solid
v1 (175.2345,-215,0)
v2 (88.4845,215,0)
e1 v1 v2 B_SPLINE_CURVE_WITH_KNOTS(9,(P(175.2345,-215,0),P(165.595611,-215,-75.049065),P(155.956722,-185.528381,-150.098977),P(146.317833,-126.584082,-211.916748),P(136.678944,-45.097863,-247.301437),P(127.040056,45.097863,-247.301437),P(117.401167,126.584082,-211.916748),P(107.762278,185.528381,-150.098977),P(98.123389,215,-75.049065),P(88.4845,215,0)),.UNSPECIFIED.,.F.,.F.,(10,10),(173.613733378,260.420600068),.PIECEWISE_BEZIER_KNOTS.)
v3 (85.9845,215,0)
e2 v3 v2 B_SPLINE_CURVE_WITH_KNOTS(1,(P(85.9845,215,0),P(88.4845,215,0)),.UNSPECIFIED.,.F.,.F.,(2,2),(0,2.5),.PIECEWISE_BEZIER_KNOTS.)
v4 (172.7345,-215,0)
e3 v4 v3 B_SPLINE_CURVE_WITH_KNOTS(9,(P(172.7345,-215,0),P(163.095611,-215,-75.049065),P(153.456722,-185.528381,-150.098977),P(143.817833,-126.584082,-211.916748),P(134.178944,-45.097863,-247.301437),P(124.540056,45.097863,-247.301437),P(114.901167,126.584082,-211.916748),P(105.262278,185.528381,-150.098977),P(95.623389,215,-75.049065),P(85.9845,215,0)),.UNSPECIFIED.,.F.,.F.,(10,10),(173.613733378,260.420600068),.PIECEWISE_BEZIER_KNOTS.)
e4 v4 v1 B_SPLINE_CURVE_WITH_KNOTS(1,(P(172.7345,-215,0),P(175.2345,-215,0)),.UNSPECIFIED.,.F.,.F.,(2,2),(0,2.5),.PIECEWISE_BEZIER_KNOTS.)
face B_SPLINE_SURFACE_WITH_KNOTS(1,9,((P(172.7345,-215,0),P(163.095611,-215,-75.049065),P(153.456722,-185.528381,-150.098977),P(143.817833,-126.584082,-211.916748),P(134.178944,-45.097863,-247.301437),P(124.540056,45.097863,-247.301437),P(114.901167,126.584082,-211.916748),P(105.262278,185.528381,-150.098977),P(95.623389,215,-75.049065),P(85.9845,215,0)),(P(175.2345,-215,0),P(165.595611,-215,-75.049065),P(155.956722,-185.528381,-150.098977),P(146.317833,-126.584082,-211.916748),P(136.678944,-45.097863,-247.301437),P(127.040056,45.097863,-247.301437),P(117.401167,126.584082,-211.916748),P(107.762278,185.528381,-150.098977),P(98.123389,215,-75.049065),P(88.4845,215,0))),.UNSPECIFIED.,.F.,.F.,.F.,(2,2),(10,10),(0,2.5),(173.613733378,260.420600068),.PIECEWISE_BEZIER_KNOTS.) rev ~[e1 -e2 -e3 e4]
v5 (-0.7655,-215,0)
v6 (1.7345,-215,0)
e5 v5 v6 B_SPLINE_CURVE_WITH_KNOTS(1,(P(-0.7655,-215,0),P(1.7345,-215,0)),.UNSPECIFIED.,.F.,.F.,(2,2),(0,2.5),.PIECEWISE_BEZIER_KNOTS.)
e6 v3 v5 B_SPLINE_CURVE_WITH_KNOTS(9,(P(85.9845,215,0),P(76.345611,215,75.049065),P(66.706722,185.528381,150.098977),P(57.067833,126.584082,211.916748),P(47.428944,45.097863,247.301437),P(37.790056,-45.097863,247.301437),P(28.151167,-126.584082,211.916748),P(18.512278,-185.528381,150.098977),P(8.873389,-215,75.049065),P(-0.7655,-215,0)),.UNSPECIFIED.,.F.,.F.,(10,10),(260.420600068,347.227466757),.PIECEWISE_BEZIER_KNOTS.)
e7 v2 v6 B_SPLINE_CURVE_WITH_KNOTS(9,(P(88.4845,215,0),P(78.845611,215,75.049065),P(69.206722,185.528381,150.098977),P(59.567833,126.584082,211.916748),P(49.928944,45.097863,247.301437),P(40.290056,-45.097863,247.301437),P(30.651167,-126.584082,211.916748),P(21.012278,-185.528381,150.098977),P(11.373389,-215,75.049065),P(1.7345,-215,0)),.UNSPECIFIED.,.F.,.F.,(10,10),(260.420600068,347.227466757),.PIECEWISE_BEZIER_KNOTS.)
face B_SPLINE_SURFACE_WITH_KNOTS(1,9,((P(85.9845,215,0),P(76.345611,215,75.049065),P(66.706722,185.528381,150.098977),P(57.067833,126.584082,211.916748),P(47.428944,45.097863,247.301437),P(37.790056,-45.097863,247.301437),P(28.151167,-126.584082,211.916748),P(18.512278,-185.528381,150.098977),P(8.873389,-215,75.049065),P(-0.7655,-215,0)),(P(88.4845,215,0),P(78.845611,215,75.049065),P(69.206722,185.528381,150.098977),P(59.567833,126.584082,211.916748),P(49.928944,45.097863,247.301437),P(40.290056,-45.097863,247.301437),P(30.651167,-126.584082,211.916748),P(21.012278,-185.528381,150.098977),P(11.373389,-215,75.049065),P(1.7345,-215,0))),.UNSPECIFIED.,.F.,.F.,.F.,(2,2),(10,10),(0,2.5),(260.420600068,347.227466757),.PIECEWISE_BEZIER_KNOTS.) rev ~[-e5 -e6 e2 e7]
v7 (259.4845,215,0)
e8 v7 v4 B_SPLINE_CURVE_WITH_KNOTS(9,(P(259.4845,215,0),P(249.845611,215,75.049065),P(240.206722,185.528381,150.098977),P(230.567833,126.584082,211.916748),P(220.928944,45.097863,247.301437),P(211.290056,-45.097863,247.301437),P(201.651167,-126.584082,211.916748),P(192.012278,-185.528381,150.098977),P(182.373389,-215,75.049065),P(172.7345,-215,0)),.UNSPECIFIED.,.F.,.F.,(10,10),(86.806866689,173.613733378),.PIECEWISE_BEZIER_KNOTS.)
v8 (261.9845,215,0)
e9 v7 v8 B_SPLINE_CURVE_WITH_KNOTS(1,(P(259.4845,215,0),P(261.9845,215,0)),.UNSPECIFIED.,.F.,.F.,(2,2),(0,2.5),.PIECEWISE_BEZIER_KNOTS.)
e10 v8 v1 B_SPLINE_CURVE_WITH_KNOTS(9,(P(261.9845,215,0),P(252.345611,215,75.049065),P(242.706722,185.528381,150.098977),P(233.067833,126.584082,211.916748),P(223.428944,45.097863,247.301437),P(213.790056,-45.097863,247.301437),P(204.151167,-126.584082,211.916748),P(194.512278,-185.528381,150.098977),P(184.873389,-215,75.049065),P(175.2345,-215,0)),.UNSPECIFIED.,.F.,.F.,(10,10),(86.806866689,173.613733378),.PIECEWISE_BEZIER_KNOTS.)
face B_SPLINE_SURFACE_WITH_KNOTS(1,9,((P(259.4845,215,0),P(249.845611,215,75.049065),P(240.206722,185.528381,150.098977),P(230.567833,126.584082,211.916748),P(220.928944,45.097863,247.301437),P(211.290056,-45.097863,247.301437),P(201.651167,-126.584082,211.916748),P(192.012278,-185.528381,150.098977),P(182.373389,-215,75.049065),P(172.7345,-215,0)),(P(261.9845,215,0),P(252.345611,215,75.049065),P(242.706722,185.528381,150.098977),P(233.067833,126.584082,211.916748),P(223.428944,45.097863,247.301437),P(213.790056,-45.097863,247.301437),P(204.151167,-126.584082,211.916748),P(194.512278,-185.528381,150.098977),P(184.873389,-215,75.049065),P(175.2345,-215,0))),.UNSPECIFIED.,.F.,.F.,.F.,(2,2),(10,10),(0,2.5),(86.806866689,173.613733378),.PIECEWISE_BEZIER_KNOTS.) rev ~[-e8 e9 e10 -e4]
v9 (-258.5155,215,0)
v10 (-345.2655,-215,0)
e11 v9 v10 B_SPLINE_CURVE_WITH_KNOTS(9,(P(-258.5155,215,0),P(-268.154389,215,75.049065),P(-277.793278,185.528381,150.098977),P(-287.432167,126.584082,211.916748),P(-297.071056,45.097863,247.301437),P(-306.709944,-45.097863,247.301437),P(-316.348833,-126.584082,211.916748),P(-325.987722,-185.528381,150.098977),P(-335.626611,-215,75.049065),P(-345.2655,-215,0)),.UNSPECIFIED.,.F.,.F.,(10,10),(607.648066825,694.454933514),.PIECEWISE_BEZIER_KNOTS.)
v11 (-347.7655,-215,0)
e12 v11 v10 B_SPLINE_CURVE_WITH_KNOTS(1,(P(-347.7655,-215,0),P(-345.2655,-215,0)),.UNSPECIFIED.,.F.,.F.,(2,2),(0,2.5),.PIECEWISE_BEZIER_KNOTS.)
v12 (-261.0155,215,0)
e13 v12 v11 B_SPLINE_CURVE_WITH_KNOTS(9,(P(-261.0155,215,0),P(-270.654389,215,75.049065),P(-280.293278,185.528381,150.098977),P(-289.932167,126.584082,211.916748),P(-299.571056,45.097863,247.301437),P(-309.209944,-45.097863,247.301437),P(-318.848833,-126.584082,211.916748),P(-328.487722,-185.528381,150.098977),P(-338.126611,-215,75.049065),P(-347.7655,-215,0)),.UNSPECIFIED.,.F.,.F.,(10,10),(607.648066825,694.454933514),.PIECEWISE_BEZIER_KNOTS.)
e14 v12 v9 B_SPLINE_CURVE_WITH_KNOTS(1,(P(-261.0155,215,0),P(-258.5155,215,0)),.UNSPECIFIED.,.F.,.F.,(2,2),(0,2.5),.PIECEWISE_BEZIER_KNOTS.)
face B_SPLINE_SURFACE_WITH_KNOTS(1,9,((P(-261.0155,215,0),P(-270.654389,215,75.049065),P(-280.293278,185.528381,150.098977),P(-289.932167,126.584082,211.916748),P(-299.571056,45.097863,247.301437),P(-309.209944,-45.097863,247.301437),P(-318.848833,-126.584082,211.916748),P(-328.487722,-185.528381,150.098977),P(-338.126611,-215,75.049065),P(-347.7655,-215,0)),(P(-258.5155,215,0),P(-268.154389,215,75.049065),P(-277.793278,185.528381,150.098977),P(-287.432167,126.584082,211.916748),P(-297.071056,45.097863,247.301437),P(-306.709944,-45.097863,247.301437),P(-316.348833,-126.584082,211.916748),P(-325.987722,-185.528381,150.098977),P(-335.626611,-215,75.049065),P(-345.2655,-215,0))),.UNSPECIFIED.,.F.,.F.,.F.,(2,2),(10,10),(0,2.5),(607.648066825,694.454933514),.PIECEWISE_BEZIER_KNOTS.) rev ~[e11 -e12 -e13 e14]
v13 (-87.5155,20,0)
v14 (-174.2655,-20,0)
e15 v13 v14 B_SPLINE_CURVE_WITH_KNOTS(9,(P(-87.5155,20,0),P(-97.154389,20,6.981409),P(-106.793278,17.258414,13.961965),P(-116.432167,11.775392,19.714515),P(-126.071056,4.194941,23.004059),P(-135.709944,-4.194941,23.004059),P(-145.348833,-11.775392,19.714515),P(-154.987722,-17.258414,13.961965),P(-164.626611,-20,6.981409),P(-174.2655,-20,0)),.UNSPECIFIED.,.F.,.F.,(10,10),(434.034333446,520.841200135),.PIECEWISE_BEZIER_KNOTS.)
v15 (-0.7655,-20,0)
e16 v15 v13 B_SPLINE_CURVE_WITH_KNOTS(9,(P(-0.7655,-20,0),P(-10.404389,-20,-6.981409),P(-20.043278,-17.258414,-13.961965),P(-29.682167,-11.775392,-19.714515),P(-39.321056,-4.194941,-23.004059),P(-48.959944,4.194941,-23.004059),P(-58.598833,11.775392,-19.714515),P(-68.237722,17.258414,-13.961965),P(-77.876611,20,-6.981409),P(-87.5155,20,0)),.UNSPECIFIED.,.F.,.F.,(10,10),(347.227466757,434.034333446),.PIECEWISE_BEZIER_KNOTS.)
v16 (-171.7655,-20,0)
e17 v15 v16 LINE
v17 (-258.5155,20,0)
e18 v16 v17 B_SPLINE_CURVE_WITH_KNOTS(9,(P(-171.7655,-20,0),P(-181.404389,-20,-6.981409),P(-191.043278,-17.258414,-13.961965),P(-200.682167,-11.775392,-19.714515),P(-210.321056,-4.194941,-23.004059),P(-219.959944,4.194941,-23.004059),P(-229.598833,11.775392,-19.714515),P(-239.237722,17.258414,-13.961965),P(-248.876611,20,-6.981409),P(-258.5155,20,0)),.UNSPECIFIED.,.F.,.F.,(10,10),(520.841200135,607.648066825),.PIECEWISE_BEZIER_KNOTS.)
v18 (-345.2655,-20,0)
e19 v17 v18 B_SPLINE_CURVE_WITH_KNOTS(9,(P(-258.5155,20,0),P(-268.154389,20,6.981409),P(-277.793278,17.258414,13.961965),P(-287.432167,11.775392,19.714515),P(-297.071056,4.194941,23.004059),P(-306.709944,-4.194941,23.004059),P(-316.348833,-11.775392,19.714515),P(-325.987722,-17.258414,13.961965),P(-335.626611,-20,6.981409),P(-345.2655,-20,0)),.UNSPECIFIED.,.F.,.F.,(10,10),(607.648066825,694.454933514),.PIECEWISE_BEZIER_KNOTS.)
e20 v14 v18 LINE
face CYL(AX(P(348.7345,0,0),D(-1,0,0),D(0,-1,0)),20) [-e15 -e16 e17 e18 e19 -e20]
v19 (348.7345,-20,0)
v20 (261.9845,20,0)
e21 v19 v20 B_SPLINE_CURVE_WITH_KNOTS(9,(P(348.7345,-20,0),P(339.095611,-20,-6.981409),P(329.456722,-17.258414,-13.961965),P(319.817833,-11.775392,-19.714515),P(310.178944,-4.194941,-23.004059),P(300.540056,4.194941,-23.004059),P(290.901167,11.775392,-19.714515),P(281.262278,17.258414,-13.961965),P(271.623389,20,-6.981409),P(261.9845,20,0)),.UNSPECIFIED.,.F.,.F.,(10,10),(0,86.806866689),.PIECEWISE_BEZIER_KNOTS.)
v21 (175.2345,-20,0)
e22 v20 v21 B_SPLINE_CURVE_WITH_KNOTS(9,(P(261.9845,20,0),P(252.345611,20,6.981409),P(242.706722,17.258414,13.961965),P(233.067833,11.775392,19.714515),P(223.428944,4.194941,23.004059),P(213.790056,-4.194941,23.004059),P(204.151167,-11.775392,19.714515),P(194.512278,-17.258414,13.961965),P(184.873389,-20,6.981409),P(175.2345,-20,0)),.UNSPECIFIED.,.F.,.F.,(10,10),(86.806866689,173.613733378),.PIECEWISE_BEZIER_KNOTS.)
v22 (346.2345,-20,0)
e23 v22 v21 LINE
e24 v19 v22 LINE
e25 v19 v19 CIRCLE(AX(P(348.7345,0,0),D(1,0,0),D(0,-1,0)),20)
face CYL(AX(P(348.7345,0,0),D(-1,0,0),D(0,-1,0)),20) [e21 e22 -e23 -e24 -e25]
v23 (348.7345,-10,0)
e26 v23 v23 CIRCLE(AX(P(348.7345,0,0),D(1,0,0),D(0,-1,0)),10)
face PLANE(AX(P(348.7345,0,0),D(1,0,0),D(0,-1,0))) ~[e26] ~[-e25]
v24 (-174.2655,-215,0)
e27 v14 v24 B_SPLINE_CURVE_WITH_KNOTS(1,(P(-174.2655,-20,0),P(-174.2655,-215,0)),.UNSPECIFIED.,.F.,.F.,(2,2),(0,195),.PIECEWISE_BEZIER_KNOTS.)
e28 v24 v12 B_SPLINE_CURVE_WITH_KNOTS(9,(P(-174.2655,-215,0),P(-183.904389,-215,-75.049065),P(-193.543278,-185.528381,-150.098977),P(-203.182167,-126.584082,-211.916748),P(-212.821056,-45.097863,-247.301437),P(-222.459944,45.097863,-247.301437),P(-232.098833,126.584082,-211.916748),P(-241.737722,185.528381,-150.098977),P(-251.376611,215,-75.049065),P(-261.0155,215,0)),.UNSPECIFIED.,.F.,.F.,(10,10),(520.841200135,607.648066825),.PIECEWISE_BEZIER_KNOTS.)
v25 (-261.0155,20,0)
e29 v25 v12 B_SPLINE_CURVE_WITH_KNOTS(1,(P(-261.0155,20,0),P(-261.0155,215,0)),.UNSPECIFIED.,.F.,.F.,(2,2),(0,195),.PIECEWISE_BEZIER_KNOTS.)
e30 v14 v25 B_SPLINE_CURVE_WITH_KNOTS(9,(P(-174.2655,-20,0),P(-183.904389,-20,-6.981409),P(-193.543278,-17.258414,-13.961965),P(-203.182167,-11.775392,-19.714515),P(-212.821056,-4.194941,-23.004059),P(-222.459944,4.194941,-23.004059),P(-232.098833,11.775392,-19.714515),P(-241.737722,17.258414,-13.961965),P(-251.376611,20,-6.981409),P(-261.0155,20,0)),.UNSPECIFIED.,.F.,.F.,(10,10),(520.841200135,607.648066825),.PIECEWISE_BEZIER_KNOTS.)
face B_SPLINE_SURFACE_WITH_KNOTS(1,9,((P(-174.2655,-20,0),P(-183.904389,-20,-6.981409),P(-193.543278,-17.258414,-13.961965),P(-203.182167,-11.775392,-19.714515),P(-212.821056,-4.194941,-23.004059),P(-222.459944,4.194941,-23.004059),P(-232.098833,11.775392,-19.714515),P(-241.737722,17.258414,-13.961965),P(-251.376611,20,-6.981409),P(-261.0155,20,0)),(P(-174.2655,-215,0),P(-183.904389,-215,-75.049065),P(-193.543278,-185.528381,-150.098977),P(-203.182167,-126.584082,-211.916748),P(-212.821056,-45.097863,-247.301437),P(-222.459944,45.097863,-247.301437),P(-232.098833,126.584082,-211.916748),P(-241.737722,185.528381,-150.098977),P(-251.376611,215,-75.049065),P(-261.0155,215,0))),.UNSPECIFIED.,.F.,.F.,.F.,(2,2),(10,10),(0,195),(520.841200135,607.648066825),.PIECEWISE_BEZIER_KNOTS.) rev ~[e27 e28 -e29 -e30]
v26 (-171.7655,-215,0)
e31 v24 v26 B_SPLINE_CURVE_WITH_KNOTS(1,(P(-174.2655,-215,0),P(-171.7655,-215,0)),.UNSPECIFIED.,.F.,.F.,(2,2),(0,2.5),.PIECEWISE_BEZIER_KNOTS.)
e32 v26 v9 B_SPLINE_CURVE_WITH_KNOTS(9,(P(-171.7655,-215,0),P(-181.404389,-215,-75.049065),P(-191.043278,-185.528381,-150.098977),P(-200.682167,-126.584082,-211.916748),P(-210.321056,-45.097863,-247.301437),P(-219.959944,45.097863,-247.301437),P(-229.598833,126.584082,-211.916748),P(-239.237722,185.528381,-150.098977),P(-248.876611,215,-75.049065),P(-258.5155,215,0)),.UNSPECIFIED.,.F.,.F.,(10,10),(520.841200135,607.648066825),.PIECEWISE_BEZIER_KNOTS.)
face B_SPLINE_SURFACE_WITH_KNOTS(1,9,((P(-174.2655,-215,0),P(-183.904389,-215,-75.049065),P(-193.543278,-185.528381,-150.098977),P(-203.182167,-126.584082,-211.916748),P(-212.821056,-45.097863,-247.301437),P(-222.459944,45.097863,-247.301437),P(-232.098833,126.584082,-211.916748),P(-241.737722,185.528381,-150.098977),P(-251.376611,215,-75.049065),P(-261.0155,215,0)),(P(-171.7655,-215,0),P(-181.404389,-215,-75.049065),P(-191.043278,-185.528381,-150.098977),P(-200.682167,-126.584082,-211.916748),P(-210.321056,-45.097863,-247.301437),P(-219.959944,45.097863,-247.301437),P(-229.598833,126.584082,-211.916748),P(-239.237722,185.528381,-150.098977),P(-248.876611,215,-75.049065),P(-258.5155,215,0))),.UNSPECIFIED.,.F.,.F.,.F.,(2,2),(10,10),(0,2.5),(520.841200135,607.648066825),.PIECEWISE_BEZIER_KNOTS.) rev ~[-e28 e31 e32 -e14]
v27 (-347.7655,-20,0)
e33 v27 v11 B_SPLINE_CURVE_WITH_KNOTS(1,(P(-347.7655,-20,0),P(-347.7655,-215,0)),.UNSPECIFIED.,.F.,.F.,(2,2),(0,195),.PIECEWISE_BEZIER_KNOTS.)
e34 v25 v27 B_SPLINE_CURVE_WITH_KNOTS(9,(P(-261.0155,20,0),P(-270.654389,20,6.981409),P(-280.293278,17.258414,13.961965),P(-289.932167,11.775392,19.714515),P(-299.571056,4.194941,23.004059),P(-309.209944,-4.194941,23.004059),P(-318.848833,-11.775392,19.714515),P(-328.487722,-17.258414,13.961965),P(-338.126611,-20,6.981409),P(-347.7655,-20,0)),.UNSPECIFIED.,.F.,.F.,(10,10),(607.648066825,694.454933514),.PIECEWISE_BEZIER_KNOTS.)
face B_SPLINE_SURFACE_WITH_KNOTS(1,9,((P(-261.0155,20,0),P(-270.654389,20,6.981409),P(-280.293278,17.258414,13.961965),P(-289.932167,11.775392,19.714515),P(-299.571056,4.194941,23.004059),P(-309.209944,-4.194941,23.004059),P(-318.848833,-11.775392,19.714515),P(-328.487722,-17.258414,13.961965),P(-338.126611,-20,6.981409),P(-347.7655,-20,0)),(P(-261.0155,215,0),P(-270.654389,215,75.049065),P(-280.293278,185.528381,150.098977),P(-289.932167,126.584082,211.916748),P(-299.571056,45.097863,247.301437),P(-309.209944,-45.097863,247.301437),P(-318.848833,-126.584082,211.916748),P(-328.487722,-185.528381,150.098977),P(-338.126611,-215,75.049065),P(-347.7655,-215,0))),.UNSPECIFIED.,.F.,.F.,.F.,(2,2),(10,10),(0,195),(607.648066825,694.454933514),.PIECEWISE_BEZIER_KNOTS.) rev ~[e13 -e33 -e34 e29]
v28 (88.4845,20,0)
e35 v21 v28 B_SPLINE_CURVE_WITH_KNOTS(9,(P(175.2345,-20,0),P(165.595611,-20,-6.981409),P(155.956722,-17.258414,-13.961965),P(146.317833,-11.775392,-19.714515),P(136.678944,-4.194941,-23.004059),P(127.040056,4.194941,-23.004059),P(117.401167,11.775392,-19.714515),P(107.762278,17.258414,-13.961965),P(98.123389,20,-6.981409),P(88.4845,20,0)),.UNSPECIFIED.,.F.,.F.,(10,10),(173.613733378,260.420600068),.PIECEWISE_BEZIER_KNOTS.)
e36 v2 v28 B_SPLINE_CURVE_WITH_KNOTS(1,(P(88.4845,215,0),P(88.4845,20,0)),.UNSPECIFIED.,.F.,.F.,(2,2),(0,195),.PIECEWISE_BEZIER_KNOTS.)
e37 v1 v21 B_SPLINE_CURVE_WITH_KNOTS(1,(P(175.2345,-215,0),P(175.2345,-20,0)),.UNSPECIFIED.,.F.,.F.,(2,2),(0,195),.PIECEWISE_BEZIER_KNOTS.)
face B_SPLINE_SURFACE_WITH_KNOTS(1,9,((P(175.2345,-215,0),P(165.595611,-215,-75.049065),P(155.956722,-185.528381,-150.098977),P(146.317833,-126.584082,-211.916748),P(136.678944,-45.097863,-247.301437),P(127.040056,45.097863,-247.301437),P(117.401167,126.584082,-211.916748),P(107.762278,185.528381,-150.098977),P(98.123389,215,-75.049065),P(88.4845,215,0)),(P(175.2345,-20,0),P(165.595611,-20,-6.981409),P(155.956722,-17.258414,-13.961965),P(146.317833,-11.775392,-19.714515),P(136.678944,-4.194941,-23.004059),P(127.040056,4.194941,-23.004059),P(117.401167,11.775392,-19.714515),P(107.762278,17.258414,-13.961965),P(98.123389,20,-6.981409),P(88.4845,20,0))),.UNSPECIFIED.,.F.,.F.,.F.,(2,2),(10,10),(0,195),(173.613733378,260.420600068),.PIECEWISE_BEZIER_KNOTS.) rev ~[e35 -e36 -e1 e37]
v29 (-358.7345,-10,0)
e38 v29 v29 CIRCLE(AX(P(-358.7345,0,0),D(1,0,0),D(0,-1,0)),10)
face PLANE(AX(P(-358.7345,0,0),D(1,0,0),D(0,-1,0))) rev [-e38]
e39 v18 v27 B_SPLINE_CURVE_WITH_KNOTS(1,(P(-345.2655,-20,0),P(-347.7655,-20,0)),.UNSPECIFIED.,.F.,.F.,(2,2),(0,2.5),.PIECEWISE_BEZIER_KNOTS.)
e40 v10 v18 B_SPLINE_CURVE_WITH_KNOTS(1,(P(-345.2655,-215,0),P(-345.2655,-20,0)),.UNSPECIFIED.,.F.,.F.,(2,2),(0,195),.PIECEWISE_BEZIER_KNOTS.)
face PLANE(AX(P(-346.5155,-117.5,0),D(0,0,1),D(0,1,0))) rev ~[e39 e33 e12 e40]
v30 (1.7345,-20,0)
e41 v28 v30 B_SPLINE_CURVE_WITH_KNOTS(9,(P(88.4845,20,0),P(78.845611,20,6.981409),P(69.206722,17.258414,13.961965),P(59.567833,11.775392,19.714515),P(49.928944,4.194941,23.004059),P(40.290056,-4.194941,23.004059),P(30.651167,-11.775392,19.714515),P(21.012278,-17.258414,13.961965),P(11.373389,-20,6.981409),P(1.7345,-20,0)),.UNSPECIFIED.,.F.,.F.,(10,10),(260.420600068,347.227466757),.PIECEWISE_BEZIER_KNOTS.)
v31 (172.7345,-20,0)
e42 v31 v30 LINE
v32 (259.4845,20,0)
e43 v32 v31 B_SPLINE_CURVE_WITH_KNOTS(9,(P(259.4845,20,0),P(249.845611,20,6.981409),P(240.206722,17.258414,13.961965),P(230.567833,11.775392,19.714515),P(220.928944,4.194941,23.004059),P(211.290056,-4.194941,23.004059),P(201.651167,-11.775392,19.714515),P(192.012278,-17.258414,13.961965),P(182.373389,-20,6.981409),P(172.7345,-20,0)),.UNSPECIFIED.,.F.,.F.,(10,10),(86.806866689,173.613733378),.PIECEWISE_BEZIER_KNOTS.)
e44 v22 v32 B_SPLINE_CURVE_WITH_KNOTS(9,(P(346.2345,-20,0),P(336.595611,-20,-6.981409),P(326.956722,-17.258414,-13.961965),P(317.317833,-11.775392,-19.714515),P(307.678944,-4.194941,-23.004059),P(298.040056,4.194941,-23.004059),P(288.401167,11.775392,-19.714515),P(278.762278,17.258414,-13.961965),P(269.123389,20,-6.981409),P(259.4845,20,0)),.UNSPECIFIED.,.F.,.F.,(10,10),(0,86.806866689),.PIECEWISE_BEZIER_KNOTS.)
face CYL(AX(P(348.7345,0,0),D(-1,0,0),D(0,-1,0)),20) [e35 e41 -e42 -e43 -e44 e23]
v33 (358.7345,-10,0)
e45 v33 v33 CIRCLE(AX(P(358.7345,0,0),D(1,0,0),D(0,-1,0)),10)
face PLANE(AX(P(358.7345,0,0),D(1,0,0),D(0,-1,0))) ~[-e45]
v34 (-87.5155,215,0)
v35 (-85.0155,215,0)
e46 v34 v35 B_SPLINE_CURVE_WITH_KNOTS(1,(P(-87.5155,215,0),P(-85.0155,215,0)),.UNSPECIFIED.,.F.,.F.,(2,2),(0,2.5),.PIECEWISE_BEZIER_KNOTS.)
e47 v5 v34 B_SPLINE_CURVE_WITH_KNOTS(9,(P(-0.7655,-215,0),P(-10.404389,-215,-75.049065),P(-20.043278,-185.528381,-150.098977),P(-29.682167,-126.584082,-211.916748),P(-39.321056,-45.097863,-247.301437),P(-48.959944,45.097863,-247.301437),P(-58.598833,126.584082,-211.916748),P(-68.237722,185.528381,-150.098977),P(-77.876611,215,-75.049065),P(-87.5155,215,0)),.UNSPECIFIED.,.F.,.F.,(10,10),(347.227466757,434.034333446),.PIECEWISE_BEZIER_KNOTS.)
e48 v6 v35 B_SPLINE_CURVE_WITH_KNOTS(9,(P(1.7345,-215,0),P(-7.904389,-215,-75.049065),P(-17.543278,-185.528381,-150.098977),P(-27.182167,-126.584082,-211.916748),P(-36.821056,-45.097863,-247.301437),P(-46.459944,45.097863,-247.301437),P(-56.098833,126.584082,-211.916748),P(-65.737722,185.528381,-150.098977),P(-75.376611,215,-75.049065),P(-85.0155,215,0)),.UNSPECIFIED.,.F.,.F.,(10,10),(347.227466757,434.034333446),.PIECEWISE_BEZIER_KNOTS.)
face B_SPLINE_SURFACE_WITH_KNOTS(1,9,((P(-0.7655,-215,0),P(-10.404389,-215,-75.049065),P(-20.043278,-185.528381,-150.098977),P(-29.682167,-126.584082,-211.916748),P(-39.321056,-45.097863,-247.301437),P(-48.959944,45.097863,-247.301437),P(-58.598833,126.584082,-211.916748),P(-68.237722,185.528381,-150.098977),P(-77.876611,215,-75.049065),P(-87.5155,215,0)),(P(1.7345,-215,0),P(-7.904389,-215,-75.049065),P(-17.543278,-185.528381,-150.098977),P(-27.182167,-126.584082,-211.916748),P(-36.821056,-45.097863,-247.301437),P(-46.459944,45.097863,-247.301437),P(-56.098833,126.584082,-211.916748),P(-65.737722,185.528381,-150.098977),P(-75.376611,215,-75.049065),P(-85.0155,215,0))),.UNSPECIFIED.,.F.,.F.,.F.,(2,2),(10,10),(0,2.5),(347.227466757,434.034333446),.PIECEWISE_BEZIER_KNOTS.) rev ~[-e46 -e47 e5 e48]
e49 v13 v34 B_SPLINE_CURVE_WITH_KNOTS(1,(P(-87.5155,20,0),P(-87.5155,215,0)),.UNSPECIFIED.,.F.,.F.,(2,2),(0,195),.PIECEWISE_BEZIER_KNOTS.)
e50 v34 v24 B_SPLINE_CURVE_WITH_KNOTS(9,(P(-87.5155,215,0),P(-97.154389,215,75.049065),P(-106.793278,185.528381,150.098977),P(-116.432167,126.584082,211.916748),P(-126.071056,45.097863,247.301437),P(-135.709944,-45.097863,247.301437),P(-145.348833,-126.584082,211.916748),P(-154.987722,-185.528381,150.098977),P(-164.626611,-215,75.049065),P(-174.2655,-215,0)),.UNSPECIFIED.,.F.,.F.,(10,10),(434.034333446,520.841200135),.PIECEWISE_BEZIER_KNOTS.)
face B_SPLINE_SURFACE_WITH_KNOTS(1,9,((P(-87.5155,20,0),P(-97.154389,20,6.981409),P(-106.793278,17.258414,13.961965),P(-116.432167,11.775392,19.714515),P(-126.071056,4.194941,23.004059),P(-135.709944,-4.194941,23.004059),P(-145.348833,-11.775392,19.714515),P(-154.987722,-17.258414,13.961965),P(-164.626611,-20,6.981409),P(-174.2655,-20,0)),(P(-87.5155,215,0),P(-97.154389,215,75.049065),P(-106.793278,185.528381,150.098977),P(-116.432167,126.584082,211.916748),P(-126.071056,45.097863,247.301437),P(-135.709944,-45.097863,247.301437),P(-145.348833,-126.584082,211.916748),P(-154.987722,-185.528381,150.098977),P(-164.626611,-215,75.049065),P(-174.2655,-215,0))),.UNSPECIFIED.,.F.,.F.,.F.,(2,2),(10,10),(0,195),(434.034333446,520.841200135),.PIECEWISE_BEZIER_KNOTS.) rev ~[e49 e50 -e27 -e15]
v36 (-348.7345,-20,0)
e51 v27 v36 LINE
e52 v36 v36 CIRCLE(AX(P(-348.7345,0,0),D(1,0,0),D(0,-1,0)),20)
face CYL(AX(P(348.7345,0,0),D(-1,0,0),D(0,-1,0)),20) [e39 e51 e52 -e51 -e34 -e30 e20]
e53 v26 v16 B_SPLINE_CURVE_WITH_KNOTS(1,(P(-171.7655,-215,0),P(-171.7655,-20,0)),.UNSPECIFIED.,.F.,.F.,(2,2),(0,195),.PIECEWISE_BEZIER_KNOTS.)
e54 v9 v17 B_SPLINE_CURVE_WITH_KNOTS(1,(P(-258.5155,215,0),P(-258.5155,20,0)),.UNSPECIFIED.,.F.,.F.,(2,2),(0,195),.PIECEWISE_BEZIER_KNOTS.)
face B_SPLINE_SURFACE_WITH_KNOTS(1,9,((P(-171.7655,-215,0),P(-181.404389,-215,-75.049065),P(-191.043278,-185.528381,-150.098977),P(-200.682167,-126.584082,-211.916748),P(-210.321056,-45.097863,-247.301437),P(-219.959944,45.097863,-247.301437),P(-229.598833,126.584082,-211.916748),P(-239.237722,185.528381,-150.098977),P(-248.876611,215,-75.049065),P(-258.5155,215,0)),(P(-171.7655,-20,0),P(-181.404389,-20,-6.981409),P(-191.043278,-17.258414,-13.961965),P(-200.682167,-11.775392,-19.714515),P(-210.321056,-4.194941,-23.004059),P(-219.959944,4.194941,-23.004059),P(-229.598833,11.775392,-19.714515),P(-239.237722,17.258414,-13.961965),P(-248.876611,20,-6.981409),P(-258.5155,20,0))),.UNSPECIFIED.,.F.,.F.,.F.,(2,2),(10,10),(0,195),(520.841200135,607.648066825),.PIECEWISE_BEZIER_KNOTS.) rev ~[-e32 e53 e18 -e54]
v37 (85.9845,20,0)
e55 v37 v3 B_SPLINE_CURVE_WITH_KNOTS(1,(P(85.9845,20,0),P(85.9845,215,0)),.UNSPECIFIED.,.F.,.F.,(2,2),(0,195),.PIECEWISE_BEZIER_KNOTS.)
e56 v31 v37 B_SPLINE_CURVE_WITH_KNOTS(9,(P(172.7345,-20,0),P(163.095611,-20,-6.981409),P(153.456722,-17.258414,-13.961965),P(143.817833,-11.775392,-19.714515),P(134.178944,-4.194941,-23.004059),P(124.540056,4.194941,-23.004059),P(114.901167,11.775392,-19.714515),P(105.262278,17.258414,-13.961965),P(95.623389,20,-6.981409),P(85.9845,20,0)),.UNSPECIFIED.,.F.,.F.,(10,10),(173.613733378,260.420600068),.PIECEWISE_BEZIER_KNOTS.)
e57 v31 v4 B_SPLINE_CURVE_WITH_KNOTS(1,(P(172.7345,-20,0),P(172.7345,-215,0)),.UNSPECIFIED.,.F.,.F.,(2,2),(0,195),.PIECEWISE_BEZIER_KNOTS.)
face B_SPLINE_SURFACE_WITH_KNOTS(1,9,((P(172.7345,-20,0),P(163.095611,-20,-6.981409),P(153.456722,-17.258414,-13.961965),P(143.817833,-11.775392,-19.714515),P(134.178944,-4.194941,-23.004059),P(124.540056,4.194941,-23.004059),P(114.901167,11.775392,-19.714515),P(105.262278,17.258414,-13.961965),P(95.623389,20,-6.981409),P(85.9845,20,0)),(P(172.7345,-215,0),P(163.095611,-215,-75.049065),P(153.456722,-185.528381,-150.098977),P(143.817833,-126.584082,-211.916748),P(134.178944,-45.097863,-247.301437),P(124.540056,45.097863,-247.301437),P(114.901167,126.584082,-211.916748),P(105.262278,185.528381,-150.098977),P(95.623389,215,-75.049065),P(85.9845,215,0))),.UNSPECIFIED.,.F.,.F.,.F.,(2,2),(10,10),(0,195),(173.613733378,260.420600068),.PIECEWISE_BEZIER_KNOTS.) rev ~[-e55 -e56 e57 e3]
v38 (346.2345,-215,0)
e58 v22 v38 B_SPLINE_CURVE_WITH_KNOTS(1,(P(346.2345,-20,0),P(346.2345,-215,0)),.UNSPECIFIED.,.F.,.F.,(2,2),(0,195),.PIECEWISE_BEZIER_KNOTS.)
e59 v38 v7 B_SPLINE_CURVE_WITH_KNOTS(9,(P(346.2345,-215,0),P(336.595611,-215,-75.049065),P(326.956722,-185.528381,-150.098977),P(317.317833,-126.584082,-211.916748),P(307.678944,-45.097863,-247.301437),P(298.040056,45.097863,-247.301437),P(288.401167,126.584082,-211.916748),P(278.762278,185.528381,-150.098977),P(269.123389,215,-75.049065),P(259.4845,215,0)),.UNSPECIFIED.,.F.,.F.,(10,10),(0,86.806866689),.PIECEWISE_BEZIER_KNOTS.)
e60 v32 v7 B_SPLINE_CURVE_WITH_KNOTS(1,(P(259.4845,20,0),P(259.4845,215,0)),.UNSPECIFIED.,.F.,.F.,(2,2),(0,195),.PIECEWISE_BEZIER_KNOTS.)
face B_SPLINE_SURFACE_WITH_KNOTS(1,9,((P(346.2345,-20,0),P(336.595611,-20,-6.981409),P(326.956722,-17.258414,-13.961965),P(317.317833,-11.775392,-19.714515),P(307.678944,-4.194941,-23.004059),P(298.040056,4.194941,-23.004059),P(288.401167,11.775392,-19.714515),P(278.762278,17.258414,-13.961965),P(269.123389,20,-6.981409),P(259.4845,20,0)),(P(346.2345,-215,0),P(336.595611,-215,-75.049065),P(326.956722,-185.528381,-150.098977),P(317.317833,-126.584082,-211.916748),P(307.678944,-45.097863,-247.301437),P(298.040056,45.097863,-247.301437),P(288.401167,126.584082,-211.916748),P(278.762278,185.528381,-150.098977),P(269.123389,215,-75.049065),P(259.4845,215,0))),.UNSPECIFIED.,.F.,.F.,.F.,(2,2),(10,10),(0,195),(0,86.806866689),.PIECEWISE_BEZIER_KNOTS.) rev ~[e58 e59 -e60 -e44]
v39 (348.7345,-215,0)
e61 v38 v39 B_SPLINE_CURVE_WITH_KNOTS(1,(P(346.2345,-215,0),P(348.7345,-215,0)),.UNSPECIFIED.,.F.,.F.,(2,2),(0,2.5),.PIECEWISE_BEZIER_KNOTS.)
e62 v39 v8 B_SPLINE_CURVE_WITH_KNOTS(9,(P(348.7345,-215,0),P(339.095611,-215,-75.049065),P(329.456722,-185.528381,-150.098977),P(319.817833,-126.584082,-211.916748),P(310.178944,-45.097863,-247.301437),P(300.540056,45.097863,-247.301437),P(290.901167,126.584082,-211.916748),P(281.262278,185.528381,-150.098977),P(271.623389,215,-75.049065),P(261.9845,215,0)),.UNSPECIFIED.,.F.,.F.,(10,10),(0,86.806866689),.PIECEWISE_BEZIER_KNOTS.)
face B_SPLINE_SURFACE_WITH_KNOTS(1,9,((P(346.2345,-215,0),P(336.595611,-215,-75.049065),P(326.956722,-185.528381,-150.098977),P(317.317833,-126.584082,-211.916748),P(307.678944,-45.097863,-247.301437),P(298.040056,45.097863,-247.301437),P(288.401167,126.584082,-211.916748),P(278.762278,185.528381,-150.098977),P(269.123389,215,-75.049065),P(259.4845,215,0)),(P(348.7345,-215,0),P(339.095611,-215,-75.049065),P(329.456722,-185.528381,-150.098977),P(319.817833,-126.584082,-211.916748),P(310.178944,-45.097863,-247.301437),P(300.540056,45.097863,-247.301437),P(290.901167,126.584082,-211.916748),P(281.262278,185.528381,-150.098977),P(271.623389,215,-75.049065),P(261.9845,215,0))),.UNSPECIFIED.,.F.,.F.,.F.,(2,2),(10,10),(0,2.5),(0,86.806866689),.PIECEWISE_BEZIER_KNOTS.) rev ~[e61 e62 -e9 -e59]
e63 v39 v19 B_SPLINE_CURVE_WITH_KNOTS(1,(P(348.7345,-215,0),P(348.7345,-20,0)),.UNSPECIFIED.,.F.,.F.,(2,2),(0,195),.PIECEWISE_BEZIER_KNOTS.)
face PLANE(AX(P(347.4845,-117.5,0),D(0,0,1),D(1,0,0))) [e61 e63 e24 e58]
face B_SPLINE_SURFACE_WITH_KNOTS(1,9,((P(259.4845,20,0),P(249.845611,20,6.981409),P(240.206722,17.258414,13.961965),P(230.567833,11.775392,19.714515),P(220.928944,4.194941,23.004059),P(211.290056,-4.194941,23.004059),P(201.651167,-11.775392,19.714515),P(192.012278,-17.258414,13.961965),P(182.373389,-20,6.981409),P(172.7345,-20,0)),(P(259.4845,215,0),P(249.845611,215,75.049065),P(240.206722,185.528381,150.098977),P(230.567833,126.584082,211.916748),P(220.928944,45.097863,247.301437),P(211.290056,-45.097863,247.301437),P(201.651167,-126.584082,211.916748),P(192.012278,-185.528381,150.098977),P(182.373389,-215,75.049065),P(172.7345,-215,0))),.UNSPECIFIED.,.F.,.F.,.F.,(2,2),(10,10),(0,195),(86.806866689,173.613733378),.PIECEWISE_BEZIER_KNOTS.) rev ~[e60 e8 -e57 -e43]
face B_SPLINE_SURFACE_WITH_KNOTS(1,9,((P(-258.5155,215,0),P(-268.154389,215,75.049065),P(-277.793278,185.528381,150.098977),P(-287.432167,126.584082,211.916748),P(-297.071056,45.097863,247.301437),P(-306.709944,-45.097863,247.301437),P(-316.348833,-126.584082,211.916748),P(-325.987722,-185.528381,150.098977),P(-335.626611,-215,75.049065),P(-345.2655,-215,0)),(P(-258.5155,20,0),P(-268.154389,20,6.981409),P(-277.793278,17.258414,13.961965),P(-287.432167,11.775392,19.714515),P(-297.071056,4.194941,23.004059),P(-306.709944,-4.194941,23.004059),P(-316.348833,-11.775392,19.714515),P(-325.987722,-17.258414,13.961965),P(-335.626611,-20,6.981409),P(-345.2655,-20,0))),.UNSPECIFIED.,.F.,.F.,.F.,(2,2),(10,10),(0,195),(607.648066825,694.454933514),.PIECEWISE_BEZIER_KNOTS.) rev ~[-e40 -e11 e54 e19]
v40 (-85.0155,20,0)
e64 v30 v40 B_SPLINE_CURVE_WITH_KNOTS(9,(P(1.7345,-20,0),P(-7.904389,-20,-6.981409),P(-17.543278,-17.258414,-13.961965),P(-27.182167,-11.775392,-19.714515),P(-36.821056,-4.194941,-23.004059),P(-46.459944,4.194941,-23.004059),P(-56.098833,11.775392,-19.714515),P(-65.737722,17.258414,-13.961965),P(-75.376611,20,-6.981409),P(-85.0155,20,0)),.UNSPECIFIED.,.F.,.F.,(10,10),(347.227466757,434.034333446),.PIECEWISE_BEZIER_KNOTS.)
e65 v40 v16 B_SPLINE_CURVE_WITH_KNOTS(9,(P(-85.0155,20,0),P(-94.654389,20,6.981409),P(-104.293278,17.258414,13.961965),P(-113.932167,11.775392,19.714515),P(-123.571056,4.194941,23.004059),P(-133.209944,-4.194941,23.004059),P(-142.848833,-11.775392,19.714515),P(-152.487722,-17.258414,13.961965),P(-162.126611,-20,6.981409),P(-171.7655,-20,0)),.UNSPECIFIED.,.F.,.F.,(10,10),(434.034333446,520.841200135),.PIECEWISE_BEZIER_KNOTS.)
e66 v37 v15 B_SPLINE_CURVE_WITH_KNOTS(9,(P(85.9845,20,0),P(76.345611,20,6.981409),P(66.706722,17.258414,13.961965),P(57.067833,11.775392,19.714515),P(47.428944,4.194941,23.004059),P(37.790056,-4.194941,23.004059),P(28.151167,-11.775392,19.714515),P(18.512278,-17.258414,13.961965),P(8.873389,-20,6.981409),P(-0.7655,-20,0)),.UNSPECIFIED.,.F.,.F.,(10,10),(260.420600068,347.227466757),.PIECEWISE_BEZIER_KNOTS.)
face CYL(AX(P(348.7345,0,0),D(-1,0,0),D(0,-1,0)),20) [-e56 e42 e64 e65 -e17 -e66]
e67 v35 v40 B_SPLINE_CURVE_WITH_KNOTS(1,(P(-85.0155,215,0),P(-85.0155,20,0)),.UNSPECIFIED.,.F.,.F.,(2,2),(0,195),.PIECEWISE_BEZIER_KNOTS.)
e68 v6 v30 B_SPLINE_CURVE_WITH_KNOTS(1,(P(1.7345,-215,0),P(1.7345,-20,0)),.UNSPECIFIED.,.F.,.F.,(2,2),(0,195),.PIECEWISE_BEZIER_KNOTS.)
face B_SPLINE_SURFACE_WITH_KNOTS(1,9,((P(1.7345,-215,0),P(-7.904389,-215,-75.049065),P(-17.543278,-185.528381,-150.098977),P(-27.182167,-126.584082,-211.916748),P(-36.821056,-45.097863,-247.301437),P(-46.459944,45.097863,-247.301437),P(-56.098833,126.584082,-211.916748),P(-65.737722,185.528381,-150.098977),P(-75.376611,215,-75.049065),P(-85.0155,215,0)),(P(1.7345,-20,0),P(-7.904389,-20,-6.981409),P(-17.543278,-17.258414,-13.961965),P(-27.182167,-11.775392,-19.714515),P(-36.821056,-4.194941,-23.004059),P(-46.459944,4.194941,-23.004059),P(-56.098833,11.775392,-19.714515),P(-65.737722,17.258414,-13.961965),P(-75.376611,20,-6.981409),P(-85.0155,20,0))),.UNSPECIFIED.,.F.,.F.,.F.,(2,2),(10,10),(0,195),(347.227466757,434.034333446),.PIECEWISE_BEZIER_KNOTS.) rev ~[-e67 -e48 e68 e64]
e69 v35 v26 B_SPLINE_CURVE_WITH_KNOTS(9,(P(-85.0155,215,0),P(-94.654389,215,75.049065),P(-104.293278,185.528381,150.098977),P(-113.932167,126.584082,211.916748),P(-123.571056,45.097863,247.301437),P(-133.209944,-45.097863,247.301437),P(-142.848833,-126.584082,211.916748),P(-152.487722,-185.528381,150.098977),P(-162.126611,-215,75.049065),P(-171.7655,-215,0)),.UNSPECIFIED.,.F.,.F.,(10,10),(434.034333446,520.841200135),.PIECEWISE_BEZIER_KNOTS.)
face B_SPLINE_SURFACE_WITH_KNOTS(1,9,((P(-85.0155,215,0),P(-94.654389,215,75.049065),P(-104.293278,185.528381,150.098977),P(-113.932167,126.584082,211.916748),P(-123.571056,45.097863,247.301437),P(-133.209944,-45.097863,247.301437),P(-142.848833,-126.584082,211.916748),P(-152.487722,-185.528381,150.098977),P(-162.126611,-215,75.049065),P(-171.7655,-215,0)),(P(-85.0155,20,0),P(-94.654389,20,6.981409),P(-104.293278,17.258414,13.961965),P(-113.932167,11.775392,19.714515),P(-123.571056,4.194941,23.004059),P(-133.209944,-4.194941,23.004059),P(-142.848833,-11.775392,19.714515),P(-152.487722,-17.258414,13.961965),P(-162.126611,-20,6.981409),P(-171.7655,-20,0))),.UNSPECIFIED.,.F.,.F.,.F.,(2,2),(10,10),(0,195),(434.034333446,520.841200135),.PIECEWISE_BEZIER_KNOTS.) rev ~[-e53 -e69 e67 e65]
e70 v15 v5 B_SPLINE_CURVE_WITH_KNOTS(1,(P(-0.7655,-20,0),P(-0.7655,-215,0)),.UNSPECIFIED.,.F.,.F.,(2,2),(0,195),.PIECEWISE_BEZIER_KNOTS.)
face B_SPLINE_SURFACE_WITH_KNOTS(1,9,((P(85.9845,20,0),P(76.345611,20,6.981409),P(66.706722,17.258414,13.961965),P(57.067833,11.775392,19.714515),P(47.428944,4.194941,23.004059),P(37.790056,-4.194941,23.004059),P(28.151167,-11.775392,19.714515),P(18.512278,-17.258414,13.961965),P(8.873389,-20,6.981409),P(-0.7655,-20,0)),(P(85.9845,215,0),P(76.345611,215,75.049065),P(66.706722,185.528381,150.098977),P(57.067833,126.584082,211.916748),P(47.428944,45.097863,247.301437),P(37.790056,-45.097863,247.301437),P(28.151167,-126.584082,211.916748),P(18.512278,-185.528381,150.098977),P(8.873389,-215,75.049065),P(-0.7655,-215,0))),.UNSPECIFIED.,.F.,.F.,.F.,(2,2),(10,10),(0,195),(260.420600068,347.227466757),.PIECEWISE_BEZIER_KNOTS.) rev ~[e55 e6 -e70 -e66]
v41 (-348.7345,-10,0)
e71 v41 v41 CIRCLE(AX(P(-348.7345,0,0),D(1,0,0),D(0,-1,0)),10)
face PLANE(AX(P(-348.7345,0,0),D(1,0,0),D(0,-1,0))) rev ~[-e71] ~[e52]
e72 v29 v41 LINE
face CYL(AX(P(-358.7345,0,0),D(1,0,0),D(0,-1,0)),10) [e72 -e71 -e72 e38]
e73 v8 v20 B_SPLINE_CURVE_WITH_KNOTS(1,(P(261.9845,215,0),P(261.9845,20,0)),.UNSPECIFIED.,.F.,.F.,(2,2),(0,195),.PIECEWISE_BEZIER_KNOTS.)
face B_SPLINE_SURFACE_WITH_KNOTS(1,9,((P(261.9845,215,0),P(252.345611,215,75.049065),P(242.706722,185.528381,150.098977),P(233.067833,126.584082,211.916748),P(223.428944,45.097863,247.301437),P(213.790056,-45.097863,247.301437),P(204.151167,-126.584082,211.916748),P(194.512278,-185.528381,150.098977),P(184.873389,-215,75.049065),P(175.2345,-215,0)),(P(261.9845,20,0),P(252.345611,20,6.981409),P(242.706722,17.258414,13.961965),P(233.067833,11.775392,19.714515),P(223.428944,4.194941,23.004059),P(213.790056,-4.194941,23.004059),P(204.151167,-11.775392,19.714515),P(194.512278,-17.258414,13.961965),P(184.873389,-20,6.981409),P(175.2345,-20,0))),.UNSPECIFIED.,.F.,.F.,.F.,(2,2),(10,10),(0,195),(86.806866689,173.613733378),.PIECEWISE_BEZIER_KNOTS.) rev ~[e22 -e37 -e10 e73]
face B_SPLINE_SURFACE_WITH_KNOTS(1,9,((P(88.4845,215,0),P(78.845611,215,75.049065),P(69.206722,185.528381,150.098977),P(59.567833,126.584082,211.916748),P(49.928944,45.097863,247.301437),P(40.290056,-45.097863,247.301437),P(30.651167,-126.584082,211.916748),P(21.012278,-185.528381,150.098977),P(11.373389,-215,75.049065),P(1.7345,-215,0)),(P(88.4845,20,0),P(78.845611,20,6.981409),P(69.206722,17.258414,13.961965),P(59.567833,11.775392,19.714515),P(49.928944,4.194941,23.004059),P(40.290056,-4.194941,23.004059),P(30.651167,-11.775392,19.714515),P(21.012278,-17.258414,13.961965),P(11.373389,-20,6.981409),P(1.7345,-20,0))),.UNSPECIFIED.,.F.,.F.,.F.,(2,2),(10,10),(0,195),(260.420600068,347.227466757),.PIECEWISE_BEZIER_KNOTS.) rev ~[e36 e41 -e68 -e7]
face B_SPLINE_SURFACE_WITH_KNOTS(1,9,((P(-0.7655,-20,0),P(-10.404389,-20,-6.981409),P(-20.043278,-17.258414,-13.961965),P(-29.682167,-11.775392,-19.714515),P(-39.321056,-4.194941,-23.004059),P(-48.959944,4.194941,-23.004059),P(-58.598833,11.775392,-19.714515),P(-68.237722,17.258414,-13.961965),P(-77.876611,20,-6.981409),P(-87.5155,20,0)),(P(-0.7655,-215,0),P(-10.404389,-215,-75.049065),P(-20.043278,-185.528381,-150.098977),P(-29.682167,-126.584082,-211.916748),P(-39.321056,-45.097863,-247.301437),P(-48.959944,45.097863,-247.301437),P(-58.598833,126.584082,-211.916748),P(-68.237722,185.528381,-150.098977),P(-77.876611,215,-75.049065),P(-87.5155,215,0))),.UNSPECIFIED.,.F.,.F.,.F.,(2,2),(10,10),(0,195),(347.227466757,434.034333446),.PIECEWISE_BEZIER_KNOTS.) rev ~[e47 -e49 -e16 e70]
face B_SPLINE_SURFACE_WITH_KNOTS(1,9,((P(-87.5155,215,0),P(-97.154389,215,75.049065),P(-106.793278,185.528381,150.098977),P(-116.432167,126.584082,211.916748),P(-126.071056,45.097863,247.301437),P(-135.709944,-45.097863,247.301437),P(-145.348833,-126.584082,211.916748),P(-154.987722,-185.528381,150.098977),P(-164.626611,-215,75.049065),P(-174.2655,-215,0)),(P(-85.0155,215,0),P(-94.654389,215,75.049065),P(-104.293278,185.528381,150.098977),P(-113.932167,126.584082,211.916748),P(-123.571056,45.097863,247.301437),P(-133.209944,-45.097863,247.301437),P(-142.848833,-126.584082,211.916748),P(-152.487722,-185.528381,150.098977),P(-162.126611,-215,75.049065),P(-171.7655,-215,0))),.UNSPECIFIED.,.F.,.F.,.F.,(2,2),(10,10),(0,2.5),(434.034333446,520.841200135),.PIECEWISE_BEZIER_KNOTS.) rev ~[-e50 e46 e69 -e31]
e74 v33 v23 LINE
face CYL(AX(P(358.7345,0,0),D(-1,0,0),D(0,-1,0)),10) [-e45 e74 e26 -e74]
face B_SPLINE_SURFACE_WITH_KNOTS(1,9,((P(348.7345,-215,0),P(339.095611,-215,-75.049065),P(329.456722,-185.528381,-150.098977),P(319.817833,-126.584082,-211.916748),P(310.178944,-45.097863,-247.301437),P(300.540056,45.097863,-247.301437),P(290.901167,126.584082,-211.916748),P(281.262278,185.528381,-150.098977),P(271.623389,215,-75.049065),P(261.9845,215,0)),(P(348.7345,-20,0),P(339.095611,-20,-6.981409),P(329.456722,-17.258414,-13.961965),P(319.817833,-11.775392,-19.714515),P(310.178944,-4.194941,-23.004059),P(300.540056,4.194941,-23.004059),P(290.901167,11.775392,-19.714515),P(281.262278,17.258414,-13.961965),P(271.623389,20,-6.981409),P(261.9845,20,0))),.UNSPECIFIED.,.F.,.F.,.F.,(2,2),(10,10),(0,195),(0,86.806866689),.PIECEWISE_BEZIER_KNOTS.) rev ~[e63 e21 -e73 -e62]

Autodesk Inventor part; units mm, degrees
ref_plane "YZ Plane" through (0, 0, 0) normal (1, 0, 0) x (0, 1, 0)
ref_plane "XZ Plane" through (0, 0, 0) normal (0, 1, 0) x (-1, 0, 0)
ref_plane "XY Plane" through (0, 0, 0) normal (0, 0, 1) x (1, 0, 0)
sketch "草圖1" plane through (0, 0, 0) normal (0, 0, 1) x (1, 0, 0)
  line L0 (-348.7345, 0) -> (348.7345, 0)
  line L1 (348.7345, 0) -> (348.7345, -20)
  line L2 (348.7345, -20) -> (-348.7345, -20)
  line L3 (-348.7345, -20) -> (-348.7345, 0)
  line L4 (-348.7345, 0) -> (-358.7345, 0)
  line L5 (-358.7345, 0) -> (-358.7345, -10)
  line L6 (-358.7345, -10) -> (-348.7345, -10)
  line L7 (-348.7345, -10) -> (-348.7345, 0)
  line L8 (348.7345, 0) -> (358.7345, 0)
  line L9 (358.7345, 0) -> (358.7345, -10)
  line L10 (358.7345, -10) -> (348.7345, -10)
  line L11 (348.7345, -10) -> (348.7345, 0)
  point P0 (0, 0)
  point P1 (0, 0)
  dimension "d0" = 697.469
  dimension "d1" = 40
  dimension "d2" = 20
  dimension "d3" = 10
  dimension "d4" = 20
  dimension "d5" = 10
revolve "迴轉1" add sketch "草圖1" angle 360 about axis through (-348.7345, 0, 0) along (1, 0, 0)
sketch "草圖2" plane through (0, 0, 0) normal (0, 0, 1) x (1, 0, 0)
  line L0 (358.7345, 10) -> (358.7345, -10) construction
  line L1 (358.7345, -10) -> (348.7345, -10) construction
  line L2 (348.7345, -10) -> (348.7345, -20) construction
  line L3 (348.7345, -20) -> (-348.7345, -20) construction
  line L4 (-348.7345, -20) -> (-348.7345, -10) construction
  line L5 (-348.7345, -10) -> (-358.7345, -10) construction
  line L6 (-358.7345, -10) -> (-358.7345, 10) construction
  line L7 (-358.7345, 10) -> (-348.7345, 10) construction
  line L8 (-348.7345, 10) -> (-348.7345, 20) construction
  line L9 (-348.7345, 20) -> (348.7345, 20) construction
  line L10 (348.7345, 20) -> (348.7345, 10) construction
  line L11 (348.7345, 10) -> (358.7345, 10) construction
  line L12 (348.7345, -20) -> (348.7345, -342.9396) construction
  line L13 (346.2345, -215) -> (348.7345, -215)
  line L14 (348.7345, -215) -> (348.7345, -20)
  line L15 (348.7345, -20) -> (346.2345, -20)
  line L16 (346.2345, -20) -> (346.2345, -215)
  line L17 (358.7345, -10) -> (348.7345, -10) construction
  line L18 (348.7345, -10) -> (348.7345, -20) construction
  line L19 (348.7345, -20) -> (-348.7345, -20) construction
  line L20 (-348.7345, -20) -> (-348.7345, -10) construction
  line L21 (-348.7345, -10) -> (-358.7345, -10) construction
  line L22 (-358.7345, 10) -> (-348.7345, 10) construction
  line L23 (-348.7345, 10) -> (-348.7345, 20) construction
  line L24 (-348.7345, 20) -> (348.7345, 20) construction
  line L25 (348.7345, 20) -> (348.7345, 10) construction
  line L26 (348.7345, 10) -> (358.7345, 10) construction
  line L27 (358.7345, 10) -> (358.7345, -10) projected
  line L28 (-358.7345, -10) -> (-358.7345, 10) projected
  point P0 (0, 0)
  dimension "d9" = 2.5
  dimension "d10" = 215
coil "螺旋1" sketch "草圖2" operation add axis through (-10, 0, 0) along (-1, 0, 0) pitch 173.5 turns 4 hand left
equation "\"d4\" = d2"
equation "\"d5\" = d3"
properties part number "Screw shaft"
